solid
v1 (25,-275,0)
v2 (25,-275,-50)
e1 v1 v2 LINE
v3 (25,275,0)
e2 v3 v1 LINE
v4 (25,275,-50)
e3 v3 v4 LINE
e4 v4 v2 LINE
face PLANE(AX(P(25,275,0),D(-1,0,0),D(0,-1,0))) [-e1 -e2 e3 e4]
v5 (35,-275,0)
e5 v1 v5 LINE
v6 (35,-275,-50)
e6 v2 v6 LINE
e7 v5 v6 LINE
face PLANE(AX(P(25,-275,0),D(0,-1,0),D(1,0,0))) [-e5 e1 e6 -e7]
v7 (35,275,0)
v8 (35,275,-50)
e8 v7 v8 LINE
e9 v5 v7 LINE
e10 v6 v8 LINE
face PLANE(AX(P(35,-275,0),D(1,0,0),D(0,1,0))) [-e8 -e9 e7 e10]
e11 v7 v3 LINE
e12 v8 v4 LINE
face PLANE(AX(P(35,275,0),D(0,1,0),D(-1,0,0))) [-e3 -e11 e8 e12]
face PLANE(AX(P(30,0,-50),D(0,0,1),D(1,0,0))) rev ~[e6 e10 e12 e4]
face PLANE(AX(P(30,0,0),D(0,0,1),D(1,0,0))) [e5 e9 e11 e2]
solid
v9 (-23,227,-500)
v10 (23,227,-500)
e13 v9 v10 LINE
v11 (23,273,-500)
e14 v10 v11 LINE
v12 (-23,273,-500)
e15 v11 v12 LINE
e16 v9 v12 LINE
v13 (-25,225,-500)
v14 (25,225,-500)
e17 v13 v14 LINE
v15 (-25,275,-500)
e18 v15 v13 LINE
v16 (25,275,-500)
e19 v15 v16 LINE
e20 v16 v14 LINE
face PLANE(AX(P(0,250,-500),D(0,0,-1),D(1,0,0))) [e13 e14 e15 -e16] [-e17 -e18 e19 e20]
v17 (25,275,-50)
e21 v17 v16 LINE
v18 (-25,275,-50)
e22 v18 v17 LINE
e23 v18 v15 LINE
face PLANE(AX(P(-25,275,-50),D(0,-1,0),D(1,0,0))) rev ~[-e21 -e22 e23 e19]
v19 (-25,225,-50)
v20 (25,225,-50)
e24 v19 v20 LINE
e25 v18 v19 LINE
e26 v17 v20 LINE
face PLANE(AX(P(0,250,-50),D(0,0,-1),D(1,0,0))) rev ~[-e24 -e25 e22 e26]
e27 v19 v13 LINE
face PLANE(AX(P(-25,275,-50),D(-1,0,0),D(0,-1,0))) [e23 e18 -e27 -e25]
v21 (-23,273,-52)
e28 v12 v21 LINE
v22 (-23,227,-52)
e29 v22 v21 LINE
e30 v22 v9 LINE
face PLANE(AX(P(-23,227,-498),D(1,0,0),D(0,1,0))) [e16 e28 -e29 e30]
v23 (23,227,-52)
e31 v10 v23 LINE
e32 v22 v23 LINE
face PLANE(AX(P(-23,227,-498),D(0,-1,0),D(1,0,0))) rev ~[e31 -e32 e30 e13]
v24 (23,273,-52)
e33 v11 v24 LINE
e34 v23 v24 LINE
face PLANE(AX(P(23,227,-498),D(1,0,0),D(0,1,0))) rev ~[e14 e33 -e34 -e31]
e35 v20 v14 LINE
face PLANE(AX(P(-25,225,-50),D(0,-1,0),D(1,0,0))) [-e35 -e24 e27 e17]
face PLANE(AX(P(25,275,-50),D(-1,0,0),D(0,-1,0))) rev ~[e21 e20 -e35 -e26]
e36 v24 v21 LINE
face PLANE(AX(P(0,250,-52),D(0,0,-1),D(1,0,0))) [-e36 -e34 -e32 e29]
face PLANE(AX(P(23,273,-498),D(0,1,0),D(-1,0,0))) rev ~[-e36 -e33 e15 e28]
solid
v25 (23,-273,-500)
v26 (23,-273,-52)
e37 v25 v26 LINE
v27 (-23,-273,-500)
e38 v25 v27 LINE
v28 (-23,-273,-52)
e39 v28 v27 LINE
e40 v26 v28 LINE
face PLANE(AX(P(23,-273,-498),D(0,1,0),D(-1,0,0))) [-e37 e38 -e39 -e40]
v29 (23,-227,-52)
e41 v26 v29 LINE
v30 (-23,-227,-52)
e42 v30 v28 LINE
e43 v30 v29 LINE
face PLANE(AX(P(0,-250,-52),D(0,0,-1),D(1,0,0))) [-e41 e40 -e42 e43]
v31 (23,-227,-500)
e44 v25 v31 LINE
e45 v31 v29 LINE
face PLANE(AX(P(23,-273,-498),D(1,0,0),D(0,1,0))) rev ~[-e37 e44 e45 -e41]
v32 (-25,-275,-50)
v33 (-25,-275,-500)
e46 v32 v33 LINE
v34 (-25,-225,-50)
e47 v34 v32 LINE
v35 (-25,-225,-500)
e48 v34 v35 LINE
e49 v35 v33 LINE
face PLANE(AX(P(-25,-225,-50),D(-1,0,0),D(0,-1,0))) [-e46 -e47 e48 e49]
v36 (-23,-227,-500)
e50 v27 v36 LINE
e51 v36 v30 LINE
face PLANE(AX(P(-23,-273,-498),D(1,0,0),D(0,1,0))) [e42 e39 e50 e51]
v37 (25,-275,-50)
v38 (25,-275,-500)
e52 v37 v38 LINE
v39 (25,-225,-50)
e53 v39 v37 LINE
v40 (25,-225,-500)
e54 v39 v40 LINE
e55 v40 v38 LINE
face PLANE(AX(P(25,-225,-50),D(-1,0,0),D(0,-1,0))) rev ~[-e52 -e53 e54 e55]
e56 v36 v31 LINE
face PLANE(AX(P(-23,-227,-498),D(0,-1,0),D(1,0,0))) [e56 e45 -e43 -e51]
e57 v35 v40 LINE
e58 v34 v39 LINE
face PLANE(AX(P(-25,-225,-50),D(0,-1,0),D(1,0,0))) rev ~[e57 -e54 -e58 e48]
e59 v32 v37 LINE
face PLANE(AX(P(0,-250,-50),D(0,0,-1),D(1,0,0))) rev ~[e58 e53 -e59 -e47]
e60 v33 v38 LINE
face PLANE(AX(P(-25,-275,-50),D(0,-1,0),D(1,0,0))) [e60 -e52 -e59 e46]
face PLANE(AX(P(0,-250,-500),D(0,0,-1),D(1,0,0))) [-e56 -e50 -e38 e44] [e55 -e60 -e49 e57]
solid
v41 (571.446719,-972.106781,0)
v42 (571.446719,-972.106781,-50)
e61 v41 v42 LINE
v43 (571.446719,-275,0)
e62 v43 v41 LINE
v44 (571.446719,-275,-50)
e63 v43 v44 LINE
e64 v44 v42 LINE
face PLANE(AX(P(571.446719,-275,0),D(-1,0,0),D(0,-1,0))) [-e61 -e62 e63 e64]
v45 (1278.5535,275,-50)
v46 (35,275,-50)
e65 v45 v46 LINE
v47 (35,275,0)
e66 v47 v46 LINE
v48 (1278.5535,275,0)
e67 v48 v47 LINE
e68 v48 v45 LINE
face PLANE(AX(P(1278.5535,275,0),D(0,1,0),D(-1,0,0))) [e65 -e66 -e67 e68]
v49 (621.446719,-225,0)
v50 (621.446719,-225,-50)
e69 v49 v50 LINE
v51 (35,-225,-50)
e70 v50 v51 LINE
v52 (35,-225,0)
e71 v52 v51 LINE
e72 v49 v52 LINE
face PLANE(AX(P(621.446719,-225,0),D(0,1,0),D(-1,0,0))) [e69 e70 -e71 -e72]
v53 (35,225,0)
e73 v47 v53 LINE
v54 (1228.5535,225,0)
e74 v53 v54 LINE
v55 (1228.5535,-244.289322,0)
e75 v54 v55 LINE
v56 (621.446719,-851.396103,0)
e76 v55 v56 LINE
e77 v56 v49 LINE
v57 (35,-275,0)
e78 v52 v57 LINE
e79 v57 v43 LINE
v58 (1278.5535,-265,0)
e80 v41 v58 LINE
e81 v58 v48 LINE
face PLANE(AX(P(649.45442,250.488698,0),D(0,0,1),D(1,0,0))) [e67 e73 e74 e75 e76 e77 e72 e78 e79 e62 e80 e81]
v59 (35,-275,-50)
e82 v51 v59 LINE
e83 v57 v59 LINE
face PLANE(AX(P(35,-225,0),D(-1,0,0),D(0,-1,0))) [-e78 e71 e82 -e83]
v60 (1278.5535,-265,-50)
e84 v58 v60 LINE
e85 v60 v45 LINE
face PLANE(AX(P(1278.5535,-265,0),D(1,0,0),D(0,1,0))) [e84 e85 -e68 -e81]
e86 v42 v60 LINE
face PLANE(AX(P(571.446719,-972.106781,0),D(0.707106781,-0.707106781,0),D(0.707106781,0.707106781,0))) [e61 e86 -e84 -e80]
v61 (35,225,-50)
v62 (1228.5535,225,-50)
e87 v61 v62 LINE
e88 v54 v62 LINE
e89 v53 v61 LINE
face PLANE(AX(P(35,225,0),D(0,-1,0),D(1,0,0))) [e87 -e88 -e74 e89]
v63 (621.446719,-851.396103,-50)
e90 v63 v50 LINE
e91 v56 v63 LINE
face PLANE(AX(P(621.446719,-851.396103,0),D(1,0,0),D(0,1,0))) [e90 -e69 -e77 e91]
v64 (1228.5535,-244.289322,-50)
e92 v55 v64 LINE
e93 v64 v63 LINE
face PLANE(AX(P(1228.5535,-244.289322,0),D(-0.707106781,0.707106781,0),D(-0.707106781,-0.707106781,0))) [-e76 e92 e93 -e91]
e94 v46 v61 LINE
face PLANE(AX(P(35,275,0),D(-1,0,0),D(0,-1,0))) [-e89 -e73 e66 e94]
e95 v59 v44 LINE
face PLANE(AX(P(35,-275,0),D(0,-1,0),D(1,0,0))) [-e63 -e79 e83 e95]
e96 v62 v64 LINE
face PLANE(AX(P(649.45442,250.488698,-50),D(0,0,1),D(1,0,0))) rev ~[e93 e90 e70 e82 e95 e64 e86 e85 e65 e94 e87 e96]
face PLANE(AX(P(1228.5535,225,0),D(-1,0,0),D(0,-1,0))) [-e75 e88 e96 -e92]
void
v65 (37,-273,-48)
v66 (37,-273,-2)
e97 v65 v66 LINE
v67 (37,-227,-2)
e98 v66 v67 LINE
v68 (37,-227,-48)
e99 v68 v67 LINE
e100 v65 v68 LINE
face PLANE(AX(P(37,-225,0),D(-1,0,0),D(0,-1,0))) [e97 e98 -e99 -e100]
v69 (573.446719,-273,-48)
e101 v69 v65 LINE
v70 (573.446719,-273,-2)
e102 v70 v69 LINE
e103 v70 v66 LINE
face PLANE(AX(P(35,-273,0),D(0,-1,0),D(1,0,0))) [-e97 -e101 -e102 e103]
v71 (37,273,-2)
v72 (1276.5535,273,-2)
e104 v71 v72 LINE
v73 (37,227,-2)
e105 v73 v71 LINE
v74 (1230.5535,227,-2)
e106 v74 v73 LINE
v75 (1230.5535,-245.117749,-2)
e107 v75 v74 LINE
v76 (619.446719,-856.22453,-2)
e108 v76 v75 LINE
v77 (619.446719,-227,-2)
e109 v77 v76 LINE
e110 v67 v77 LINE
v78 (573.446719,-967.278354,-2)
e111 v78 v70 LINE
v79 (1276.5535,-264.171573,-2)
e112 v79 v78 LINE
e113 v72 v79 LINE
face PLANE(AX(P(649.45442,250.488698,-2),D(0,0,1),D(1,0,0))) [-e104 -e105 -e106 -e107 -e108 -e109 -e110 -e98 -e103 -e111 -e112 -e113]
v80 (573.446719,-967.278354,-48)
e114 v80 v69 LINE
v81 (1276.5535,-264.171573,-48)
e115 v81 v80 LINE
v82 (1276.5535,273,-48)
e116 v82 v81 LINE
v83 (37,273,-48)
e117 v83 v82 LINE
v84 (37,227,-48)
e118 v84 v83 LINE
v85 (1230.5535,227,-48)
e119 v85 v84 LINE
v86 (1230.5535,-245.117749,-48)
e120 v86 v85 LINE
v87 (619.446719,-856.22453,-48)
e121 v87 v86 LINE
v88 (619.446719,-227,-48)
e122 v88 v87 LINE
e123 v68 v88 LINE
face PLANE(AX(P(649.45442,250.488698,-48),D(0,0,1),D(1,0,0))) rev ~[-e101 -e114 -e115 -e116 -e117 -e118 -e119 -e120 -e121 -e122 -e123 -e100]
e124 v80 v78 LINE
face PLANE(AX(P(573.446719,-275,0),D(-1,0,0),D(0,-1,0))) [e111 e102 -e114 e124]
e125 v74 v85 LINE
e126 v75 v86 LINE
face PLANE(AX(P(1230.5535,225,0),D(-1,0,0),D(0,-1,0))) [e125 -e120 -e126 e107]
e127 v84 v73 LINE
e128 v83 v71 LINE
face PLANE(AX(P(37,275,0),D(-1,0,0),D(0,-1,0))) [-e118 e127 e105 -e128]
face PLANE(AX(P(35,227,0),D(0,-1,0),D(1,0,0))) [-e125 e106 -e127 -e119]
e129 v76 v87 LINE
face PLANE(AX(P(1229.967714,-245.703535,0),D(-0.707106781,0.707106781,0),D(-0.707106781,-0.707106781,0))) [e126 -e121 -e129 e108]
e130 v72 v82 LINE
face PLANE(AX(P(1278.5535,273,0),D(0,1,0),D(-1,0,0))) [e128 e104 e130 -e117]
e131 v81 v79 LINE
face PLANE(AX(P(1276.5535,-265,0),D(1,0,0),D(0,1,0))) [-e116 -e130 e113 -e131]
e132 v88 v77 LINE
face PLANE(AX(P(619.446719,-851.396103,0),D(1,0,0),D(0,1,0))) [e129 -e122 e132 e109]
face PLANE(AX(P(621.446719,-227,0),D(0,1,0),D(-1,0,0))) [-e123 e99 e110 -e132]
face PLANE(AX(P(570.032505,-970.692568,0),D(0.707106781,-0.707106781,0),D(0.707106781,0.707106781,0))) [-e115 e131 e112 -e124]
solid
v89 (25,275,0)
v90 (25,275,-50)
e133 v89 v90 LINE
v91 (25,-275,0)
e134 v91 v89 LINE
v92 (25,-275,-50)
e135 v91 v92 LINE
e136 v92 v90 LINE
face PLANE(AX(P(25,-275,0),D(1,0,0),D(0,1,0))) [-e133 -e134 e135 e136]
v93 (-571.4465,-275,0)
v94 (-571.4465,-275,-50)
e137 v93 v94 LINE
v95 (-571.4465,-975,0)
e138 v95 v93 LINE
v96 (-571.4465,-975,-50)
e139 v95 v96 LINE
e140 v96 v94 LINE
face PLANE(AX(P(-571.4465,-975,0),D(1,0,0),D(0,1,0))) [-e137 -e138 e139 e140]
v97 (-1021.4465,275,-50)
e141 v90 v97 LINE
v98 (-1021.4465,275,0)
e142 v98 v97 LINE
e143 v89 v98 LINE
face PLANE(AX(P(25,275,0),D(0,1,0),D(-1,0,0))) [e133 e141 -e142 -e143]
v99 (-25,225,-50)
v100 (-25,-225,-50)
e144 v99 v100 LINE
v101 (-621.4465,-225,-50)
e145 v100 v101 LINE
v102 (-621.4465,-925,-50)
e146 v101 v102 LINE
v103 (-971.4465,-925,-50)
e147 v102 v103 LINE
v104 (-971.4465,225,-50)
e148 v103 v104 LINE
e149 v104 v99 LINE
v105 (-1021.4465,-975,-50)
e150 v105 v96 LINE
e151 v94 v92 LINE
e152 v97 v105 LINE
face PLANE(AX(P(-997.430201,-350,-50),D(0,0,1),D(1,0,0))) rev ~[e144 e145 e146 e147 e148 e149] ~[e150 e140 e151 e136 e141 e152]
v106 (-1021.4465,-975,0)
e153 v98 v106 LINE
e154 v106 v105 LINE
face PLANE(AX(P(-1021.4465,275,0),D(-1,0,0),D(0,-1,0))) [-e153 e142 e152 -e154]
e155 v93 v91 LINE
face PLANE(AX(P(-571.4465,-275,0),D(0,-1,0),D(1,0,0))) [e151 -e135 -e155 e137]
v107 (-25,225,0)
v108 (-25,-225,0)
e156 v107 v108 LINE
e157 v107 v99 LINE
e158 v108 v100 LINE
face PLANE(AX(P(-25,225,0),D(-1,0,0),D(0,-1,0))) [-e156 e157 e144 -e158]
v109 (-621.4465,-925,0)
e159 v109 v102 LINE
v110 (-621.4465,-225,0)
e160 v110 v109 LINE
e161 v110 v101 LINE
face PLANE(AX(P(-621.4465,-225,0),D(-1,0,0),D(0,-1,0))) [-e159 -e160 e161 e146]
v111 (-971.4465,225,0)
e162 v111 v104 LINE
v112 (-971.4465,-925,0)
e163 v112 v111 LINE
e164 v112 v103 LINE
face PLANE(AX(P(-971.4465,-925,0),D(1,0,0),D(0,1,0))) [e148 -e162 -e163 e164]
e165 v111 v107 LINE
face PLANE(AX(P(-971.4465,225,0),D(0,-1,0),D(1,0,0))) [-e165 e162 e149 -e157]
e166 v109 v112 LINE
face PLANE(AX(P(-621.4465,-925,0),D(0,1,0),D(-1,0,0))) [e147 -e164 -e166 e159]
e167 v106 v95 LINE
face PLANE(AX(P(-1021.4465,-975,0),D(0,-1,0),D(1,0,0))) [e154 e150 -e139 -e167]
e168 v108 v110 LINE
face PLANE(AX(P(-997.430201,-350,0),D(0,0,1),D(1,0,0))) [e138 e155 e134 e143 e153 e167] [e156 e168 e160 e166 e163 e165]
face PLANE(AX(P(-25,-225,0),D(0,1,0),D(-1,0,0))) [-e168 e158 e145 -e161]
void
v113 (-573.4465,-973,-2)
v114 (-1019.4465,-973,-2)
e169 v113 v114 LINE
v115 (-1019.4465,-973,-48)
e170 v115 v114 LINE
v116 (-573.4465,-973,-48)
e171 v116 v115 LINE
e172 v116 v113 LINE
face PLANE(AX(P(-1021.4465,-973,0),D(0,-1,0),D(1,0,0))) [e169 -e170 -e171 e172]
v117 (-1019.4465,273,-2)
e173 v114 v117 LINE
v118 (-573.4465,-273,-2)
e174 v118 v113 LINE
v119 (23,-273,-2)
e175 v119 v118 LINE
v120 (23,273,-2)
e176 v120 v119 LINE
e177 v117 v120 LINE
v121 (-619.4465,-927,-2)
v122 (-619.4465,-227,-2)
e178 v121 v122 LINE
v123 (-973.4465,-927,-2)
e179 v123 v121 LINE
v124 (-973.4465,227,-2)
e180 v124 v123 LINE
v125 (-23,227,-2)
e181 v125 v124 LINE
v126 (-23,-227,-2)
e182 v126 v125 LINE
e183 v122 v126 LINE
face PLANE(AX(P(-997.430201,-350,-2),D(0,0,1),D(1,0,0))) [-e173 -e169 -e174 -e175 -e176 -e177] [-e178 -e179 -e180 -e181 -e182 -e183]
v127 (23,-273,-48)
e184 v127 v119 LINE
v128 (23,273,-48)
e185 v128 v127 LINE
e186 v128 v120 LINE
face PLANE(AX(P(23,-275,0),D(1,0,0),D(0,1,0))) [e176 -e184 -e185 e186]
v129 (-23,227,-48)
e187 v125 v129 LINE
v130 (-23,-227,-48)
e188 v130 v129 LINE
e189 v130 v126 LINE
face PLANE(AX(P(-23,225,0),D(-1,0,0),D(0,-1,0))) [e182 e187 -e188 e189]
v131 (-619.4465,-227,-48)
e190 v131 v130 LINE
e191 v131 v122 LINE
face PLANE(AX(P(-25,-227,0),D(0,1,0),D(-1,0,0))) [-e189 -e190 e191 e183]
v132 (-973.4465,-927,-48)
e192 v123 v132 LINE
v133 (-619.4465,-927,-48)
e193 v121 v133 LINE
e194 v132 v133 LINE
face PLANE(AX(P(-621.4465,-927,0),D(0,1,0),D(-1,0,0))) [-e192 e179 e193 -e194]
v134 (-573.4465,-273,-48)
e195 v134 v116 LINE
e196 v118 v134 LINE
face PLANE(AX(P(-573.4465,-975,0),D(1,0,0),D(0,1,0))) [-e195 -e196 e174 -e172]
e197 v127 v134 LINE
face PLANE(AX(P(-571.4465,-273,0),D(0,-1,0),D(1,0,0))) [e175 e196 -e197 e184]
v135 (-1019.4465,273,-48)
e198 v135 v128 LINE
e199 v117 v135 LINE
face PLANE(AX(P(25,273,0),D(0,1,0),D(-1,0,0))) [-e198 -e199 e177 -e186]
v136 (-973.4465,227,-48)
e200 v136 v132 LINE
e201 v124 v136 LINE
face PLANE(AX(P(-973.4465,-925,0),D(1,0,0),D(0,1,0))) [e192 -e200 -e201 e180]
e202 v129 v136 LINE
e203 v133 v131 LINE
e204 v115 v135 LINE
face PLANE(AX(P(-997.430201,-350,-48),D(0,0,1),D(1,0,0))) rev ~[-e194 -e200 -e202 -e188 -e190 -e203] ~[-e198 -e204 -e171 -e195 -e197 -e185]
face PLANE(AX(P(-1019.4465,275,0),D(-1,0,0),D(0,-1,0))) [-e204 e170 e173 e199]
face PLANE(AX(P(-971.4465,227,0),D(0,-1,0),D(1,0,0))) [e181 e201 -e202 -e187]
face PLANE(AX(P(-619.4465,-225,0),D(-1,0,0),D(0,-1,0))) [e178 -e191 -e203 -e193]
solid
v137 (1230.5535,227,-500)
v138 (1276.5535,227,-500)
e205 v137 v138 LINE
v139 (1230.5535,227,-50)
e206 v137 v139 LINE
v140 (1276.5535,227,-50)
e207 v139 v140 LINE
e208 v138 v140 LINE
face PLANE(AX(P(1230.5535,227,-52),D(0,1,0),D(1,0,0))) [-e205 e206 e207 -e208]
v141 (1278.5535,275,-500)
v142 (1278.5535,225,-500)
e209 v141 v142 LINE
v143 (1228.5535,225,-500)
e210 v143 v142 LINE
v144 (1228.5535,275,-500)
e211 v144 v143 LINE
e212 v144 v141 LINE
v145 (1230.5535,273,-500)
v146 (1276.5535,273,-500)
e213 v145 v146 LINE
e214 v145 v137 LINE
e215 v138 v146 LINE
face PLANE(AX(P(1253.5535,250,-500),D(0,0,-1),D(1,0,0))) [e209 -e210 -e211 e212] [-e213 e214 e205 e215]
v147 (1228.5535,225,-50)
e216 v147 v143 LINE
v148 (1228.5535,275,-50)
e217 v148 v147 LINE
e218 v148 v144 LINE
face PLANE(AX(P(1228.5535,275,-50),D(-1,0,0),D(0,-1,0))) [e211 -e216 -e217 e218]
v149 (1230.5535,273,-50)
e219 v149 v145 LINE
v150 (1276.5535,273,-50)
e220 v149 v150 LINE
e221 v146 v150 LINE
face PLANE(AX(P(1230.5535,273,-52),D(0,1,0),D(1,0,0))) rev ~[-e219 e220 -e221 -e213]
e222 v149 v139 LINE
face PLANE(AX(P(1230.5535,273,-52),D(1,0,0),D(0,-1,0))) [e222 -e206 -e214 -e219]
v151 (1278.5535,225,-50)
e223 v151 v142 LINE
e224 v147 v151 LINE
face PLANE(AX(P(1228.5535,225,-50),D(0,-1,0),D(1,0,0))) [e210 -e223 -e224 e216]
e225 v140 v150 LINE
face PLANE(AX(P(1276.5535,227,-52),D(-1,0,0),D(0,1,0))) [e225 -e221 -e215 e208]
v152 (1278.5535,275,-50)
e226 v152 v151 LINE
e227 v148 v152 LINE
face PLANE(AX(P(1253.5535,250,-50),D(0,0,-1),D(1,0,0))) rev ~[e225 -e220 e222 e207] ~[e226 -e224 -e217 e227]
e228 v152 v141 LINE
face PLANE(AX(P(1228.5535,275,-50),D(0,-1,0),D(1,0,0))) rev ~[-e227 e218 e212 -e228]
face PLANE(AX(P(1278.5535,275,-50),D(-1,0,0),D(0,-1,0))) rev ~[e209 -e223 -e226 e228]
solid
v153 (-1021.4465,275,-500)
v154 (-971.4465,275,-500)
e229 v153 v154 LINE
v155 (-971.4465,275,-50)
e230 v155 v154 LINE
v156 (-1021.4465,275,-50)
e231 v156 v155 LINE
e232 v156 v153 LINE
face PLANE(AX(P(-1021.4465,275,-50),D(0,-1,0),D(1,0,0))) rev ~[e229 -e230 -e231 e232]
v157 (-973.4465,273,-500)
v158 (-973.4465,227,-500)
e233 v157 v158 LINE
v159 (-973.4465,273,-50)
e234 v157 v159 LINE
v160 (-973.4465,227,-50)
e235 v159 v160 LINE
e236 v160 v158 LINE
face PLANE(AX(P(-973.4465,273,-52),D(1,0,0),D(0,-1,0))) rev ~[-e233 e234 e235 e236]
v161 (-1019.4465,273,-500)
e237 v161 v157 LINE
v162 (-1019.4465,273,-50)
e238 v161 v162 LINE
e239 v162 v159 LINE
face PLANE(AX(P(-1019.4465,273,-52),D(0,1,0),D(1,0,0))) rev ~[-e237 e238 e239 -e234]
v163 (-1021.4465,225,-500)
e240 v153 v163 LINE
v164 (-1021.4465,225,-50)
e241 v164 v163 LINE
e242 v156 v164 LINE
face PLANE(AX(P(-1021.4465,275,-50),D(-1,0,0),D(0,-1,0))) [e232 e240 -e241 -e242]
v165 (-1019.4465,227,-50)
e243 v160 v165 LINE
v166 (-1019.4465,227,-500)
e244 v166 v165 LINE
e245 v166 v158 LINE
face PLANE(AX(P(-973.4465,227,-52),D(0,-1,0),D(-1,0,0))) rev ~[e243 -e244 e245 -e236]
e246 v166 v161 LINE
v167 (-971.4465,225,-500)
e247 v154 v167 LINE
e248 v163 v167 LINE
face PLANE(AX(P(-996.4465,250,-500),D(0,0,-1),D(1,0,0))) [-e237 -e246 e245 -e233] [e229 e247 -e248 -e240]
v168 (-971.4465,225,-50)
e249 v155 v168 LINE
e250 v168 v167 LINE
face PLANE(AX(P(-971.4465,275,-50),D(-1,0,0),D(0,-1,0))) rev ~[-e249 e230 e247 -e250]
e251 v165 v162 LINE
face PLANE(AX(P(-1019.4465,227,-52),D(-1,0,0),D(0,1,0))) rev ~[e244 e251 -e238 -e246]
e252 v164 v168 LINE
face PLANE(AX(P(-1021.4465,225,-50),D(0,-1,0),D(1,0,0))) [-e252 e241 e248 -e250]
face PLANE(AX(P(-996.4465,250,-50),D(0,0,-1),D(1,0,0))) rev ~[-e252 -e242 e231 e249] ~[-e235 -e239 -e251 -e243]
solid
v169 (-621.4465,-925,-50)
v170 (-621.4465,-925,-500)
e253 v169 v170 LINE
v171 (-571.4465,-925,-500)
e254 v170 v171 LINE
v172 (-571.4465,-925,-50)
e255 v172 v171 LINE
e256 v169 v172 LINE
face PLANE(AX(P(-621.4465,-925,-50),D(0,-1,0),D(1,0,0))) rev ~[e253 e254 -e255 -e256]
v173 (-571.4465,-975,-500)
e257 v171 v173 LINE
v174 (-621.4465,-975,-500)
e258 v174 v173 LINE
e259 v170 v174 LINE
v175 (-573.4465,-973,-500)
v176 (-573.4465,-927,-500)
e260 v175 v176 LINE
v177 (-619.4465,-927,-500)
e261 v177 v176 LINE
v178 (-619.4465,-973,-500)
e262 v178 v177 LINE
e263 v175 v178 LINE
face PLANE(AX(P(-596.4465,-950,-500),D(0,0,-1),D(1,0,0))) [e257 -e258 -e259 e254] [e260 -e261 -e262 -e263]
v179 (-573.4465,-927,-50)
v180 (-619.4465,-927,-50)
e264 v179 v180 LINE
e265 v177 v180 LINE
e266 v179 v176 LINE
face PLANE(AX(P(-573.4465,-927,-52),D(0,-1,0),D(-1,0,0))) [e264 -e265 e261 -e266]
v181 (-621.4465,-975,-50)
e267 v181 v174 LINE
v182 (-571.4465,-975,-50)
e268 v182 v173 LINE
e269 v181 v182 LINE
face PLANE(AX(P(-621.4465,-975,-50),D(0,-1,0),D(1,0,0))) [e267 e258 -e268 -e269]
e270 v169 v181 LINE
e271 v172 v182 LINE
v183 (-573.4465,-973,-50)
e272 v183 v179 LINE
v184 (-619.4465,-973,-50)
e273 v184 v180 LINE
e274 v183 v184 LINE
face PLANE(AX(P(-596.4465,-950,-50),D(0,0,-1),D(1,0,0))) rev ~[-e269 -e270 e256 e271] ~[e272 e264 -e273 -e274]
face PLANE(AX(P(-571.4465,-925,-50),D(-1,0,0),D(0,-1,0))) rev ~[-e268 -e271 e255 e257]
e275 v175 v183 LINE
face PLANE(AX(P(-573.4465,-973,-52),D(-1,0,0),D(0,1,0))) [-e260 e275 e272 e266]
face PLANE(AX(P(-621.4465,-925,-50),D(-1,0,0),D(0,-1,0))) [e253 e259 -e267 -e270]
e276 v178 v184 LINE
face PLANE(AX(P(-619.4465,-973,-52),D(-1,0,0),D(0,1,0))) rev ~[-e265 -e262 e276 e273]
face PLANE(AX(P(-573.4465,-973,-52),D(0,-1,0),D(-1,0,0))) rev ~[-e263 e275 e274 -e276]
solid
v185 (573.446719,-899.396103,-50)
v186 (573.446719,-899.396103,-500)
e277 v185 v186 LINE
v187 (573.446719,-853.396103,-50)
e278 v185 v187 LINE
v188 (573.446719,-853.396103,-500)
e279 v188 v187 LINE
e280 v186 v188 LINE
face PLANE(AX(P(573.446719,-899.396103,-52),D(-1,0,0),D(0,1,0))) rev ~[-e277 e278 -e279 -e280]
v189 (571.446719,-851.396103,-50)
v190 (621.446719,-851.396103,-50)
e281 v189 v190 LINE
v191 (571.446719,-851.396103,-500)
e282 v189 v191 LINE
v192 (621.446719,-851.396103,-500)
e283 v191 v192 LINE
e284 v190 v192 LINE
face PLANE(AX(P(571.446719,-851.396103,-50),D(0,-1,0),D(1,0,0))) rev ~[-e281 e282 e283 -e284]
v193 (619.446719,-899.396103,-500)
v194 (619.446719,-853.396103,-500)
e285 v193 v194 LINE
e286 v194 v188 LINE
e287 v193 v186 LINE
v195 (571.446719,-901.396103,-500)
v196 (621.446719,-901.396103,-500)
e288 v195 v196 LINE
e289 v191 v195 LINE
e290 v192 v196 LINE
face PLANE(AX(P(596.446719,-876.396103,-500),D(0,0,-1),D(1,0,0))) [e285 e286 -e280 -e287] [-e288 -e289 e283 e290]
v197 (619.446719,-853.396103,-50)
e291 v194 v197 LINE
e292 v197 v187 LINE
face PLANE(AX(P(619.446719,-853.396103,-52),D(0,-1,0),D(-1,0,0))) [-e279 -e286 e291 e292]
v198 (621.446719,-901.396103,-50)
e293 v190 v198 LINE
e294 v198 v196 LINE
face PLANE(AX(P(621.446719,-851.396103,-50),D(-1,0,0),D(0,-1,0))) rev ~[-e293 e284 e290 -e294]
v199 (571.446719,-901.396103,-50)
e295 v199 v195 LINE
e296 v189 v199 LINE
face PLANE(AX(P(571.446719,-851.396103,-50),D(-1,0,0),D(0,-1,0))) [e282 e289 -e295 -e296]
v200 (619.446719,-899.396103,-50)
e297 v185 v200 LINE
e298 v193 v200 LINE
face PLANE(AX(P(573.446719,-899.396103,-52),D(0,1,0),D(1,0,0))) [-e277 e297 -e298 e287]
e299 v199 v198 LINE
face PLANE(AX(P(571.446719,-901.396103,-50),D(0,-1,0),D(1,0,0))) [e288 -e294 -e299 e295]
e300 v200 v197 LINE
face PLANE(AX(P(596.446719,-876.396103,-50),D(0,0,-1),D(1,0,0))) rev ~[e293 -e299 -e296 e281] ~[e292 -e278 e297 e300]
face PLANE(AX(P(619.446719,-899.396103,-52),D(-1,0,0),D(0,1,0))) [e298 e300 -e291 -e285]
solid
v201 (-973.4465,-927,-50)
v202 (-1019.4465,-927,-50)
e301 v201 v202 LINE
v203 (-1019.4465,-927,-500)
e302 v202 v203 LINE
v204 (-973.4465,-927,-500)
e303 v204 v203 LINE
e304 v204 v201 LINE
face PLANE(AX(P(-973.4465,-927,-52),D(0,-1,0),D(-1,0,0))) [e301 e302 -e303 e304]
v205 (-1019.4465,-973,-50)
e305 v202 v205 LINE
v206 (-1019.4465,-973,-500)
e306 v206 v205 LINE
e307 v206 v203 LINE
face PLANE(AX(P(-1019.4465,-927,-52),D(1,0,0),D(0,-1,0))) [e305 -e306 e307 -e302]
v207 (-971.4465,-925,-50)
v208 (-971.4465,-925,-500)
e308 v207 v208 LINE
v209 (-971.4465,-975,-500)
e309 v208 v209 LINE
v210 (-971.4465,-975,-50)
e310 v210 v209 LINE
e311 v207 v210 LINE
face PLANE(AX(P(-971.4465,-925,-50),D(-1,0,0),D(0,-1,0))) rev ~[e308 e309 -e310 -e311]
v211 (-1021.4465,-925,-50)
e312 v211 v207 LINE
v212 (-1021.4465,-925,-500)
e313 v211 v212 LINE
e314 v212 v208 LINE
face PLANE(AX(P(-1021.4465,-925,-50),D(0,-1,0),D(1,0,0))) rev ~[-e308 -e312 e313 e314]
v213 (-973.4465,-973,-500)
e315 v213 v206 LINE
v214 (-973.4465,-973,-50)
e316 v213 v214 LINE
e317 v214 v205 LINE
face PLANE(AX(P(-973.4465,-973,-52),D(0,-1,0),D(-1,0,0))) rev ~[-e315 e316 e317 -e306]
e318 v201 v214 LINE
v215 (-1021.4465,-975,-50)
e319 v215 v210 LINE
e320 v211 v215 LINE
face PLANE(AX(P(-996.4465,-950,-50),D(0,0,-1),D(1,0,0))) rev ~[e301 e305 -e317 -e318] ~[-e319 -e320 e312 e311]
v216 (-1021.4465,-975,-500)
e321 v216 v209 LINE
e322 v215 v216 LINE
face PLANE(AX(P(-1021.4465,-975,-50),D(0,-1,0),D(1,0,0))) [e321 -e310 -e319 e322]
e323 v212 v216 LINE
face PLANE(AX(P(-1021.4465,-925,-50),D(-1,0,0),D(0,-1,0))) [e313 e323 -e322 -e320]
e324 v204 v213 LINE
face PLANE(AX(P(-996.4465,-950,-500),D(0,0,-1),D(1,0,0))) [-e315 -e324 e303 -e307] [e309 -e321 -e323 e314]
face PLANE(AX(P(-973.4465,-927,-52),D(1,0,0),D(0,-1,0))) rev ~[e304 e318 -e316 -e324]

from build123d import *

# Parameters (mm, degrees)
F1_DEPTH = 50
F2_DEPTH = 50
F3_DEPTH = 50
F4_T     = -2
F5_W     = 50
F5_H     = 50
F6_DEPTH = 450
F7_T     = -2


# Not quite as in the source:
# - a shell that OpenCascade refuses in one call is made with other operations: the cavity is built on its own and cut out


with BuildPart() as f1:
    # F0 (on Top) → F1 (new body)
    with BuildSketch(Plane.XY):
        Polygon((1278.5535, 275), (35, 275), (35, 225), (1228.5535, 225), align=None)
        Polygon((35, -225), (35, -275), (571.4467188135, -275), (621.4467188135, -225), align=None)
        Polygon((1278.5535, -265), (1278.5535, 275), (1228.5535, 225), (1228.5535, -244.2893218813), align=None)
        Polygon((621.4467188135, -851.3961030679), (571.4467188135, -901.3961030679), (571.4467188135, -972.1067811865), (1278.5535, -265), (1228.5535, -244.2893218813), align=None)
        Polygon((621.4467188135, -225), (571.4467188135, -275), (571.4467188135, -901.3961030679), (621.4467188135, -851.3961030679), align=None)
    extrude(amount=-F1_DEPTH)

    # F4#2 (hollow: no face is removed)
    offset(amount=F4_T, kind=Kind.INTERSECTION, mode=Mode.SUBTRACT)


with BuildPart() as f2:
    # F0 (on Top) → F2 (new body)
    with BuildSketch(Plane.XY):
        Polygon((-1021.4465, 275), (-1021.4465, -975), (-971.4465, -925), (-971.4465, 225), align=None)
        Polygon((-1021.4465, -975), (-571.4465, -975), (-621.4465, -925), (-971.4465, -925), align=None)
        Polygon((-621.4465, -925), (-571.4465, -975), (-571.4465, -275), (-621.4465, -225), align=None)
        Polygon((25, 275), (-1021.4465, 275), (-971.4465, 225), (-25, 225), align=None)
        Polygon((-621.4465, -225), (-571.4465, -275), (25, -275), (-25, -225), align=None)
        Polygon((-25, -225), (25, -275), (25, 275), (-25, 225), align=None)
    extrude(amount=-F2_DEPTH)

    # F4 (hollow: no face is removed)
    offset(amount=F4_T, kind=Kind.INTERSECTION, mode=Mode.SUBTRACT)


with BuildPart() as f3:
    # F0 (on Top) → F3 (new body)
    with BuildSketch(Plane.XY):
        Polygon((25, 275), (25, -275), (35, -275), (35, -225), (35, 225), (35, 275), align=None)
    extrude(amount=-F3_DEPTH)


with BuildPart() as f6:
    # F5 (on face) → F6 (new body)
    with BuildSketch(Plane(origin=(0, 0, -50), x_dir=(1, 0, 0), z_dir=(0, 0, -1))):
        with Locations((-996.4465, 950)):
            Rectangle(F5_W, F5_H)
        with Locations((-996.4465, -250)):
            Rectangle(F5_W, F5_H)
        with Locations((1253.5535, -250)):
            Rectangle(F5_W, F5_H)
        with Locations((596.4467188135, 876.3961030679)):
            Rectangle(F5_W, F5_H)
        with Locations((-596.4465, 950)):
            Rectangle(F5_W, F5_H)
        with Locations((0, 250)):
            Rectangle(F5_W, F5_H)
        with Locations((0, -250)):
            Rectangle(F5_W, F5_H)
    extrude(amount=F6_DEPTH)

    # F7: a shell. OpenCascade refuses it in one call, so the cavity is built on its own and cut out:
    # the body offset inwards by the wall thickness, plus a prism from it out through each open face.
    f7_core = offset(f6.part, amount=F7_T, mode=Mode.PRIVATE)
    f7_exits = [f7_core.faces().sort_by_distance(p)[0] for p in [
        (-996.4465, 250, -52),
        (-996.4465, -950, -52),
        (-996.4465, -950, -498),
        (-996.4465, 250, -498),
        (596.446719, -876.396103, -498),
        (1253.5535, 250, -498),
        (596.446719, -876.396103, -52),
        (1253.5535, 250, -52),
        (-596.4465, -950, -498),
        (-596.4465, -950, -52),
        (0, -250, -498),
        (0, 250, -498),
    ]]
    add(f7_core, mode=Mode.SUBTRACT)
    extrude(f7_exits, amount=-F7_T, mode=Mode.SUBTRACT)


solid = Compound([f1.part, f2.part, f3.part, f6.part])
